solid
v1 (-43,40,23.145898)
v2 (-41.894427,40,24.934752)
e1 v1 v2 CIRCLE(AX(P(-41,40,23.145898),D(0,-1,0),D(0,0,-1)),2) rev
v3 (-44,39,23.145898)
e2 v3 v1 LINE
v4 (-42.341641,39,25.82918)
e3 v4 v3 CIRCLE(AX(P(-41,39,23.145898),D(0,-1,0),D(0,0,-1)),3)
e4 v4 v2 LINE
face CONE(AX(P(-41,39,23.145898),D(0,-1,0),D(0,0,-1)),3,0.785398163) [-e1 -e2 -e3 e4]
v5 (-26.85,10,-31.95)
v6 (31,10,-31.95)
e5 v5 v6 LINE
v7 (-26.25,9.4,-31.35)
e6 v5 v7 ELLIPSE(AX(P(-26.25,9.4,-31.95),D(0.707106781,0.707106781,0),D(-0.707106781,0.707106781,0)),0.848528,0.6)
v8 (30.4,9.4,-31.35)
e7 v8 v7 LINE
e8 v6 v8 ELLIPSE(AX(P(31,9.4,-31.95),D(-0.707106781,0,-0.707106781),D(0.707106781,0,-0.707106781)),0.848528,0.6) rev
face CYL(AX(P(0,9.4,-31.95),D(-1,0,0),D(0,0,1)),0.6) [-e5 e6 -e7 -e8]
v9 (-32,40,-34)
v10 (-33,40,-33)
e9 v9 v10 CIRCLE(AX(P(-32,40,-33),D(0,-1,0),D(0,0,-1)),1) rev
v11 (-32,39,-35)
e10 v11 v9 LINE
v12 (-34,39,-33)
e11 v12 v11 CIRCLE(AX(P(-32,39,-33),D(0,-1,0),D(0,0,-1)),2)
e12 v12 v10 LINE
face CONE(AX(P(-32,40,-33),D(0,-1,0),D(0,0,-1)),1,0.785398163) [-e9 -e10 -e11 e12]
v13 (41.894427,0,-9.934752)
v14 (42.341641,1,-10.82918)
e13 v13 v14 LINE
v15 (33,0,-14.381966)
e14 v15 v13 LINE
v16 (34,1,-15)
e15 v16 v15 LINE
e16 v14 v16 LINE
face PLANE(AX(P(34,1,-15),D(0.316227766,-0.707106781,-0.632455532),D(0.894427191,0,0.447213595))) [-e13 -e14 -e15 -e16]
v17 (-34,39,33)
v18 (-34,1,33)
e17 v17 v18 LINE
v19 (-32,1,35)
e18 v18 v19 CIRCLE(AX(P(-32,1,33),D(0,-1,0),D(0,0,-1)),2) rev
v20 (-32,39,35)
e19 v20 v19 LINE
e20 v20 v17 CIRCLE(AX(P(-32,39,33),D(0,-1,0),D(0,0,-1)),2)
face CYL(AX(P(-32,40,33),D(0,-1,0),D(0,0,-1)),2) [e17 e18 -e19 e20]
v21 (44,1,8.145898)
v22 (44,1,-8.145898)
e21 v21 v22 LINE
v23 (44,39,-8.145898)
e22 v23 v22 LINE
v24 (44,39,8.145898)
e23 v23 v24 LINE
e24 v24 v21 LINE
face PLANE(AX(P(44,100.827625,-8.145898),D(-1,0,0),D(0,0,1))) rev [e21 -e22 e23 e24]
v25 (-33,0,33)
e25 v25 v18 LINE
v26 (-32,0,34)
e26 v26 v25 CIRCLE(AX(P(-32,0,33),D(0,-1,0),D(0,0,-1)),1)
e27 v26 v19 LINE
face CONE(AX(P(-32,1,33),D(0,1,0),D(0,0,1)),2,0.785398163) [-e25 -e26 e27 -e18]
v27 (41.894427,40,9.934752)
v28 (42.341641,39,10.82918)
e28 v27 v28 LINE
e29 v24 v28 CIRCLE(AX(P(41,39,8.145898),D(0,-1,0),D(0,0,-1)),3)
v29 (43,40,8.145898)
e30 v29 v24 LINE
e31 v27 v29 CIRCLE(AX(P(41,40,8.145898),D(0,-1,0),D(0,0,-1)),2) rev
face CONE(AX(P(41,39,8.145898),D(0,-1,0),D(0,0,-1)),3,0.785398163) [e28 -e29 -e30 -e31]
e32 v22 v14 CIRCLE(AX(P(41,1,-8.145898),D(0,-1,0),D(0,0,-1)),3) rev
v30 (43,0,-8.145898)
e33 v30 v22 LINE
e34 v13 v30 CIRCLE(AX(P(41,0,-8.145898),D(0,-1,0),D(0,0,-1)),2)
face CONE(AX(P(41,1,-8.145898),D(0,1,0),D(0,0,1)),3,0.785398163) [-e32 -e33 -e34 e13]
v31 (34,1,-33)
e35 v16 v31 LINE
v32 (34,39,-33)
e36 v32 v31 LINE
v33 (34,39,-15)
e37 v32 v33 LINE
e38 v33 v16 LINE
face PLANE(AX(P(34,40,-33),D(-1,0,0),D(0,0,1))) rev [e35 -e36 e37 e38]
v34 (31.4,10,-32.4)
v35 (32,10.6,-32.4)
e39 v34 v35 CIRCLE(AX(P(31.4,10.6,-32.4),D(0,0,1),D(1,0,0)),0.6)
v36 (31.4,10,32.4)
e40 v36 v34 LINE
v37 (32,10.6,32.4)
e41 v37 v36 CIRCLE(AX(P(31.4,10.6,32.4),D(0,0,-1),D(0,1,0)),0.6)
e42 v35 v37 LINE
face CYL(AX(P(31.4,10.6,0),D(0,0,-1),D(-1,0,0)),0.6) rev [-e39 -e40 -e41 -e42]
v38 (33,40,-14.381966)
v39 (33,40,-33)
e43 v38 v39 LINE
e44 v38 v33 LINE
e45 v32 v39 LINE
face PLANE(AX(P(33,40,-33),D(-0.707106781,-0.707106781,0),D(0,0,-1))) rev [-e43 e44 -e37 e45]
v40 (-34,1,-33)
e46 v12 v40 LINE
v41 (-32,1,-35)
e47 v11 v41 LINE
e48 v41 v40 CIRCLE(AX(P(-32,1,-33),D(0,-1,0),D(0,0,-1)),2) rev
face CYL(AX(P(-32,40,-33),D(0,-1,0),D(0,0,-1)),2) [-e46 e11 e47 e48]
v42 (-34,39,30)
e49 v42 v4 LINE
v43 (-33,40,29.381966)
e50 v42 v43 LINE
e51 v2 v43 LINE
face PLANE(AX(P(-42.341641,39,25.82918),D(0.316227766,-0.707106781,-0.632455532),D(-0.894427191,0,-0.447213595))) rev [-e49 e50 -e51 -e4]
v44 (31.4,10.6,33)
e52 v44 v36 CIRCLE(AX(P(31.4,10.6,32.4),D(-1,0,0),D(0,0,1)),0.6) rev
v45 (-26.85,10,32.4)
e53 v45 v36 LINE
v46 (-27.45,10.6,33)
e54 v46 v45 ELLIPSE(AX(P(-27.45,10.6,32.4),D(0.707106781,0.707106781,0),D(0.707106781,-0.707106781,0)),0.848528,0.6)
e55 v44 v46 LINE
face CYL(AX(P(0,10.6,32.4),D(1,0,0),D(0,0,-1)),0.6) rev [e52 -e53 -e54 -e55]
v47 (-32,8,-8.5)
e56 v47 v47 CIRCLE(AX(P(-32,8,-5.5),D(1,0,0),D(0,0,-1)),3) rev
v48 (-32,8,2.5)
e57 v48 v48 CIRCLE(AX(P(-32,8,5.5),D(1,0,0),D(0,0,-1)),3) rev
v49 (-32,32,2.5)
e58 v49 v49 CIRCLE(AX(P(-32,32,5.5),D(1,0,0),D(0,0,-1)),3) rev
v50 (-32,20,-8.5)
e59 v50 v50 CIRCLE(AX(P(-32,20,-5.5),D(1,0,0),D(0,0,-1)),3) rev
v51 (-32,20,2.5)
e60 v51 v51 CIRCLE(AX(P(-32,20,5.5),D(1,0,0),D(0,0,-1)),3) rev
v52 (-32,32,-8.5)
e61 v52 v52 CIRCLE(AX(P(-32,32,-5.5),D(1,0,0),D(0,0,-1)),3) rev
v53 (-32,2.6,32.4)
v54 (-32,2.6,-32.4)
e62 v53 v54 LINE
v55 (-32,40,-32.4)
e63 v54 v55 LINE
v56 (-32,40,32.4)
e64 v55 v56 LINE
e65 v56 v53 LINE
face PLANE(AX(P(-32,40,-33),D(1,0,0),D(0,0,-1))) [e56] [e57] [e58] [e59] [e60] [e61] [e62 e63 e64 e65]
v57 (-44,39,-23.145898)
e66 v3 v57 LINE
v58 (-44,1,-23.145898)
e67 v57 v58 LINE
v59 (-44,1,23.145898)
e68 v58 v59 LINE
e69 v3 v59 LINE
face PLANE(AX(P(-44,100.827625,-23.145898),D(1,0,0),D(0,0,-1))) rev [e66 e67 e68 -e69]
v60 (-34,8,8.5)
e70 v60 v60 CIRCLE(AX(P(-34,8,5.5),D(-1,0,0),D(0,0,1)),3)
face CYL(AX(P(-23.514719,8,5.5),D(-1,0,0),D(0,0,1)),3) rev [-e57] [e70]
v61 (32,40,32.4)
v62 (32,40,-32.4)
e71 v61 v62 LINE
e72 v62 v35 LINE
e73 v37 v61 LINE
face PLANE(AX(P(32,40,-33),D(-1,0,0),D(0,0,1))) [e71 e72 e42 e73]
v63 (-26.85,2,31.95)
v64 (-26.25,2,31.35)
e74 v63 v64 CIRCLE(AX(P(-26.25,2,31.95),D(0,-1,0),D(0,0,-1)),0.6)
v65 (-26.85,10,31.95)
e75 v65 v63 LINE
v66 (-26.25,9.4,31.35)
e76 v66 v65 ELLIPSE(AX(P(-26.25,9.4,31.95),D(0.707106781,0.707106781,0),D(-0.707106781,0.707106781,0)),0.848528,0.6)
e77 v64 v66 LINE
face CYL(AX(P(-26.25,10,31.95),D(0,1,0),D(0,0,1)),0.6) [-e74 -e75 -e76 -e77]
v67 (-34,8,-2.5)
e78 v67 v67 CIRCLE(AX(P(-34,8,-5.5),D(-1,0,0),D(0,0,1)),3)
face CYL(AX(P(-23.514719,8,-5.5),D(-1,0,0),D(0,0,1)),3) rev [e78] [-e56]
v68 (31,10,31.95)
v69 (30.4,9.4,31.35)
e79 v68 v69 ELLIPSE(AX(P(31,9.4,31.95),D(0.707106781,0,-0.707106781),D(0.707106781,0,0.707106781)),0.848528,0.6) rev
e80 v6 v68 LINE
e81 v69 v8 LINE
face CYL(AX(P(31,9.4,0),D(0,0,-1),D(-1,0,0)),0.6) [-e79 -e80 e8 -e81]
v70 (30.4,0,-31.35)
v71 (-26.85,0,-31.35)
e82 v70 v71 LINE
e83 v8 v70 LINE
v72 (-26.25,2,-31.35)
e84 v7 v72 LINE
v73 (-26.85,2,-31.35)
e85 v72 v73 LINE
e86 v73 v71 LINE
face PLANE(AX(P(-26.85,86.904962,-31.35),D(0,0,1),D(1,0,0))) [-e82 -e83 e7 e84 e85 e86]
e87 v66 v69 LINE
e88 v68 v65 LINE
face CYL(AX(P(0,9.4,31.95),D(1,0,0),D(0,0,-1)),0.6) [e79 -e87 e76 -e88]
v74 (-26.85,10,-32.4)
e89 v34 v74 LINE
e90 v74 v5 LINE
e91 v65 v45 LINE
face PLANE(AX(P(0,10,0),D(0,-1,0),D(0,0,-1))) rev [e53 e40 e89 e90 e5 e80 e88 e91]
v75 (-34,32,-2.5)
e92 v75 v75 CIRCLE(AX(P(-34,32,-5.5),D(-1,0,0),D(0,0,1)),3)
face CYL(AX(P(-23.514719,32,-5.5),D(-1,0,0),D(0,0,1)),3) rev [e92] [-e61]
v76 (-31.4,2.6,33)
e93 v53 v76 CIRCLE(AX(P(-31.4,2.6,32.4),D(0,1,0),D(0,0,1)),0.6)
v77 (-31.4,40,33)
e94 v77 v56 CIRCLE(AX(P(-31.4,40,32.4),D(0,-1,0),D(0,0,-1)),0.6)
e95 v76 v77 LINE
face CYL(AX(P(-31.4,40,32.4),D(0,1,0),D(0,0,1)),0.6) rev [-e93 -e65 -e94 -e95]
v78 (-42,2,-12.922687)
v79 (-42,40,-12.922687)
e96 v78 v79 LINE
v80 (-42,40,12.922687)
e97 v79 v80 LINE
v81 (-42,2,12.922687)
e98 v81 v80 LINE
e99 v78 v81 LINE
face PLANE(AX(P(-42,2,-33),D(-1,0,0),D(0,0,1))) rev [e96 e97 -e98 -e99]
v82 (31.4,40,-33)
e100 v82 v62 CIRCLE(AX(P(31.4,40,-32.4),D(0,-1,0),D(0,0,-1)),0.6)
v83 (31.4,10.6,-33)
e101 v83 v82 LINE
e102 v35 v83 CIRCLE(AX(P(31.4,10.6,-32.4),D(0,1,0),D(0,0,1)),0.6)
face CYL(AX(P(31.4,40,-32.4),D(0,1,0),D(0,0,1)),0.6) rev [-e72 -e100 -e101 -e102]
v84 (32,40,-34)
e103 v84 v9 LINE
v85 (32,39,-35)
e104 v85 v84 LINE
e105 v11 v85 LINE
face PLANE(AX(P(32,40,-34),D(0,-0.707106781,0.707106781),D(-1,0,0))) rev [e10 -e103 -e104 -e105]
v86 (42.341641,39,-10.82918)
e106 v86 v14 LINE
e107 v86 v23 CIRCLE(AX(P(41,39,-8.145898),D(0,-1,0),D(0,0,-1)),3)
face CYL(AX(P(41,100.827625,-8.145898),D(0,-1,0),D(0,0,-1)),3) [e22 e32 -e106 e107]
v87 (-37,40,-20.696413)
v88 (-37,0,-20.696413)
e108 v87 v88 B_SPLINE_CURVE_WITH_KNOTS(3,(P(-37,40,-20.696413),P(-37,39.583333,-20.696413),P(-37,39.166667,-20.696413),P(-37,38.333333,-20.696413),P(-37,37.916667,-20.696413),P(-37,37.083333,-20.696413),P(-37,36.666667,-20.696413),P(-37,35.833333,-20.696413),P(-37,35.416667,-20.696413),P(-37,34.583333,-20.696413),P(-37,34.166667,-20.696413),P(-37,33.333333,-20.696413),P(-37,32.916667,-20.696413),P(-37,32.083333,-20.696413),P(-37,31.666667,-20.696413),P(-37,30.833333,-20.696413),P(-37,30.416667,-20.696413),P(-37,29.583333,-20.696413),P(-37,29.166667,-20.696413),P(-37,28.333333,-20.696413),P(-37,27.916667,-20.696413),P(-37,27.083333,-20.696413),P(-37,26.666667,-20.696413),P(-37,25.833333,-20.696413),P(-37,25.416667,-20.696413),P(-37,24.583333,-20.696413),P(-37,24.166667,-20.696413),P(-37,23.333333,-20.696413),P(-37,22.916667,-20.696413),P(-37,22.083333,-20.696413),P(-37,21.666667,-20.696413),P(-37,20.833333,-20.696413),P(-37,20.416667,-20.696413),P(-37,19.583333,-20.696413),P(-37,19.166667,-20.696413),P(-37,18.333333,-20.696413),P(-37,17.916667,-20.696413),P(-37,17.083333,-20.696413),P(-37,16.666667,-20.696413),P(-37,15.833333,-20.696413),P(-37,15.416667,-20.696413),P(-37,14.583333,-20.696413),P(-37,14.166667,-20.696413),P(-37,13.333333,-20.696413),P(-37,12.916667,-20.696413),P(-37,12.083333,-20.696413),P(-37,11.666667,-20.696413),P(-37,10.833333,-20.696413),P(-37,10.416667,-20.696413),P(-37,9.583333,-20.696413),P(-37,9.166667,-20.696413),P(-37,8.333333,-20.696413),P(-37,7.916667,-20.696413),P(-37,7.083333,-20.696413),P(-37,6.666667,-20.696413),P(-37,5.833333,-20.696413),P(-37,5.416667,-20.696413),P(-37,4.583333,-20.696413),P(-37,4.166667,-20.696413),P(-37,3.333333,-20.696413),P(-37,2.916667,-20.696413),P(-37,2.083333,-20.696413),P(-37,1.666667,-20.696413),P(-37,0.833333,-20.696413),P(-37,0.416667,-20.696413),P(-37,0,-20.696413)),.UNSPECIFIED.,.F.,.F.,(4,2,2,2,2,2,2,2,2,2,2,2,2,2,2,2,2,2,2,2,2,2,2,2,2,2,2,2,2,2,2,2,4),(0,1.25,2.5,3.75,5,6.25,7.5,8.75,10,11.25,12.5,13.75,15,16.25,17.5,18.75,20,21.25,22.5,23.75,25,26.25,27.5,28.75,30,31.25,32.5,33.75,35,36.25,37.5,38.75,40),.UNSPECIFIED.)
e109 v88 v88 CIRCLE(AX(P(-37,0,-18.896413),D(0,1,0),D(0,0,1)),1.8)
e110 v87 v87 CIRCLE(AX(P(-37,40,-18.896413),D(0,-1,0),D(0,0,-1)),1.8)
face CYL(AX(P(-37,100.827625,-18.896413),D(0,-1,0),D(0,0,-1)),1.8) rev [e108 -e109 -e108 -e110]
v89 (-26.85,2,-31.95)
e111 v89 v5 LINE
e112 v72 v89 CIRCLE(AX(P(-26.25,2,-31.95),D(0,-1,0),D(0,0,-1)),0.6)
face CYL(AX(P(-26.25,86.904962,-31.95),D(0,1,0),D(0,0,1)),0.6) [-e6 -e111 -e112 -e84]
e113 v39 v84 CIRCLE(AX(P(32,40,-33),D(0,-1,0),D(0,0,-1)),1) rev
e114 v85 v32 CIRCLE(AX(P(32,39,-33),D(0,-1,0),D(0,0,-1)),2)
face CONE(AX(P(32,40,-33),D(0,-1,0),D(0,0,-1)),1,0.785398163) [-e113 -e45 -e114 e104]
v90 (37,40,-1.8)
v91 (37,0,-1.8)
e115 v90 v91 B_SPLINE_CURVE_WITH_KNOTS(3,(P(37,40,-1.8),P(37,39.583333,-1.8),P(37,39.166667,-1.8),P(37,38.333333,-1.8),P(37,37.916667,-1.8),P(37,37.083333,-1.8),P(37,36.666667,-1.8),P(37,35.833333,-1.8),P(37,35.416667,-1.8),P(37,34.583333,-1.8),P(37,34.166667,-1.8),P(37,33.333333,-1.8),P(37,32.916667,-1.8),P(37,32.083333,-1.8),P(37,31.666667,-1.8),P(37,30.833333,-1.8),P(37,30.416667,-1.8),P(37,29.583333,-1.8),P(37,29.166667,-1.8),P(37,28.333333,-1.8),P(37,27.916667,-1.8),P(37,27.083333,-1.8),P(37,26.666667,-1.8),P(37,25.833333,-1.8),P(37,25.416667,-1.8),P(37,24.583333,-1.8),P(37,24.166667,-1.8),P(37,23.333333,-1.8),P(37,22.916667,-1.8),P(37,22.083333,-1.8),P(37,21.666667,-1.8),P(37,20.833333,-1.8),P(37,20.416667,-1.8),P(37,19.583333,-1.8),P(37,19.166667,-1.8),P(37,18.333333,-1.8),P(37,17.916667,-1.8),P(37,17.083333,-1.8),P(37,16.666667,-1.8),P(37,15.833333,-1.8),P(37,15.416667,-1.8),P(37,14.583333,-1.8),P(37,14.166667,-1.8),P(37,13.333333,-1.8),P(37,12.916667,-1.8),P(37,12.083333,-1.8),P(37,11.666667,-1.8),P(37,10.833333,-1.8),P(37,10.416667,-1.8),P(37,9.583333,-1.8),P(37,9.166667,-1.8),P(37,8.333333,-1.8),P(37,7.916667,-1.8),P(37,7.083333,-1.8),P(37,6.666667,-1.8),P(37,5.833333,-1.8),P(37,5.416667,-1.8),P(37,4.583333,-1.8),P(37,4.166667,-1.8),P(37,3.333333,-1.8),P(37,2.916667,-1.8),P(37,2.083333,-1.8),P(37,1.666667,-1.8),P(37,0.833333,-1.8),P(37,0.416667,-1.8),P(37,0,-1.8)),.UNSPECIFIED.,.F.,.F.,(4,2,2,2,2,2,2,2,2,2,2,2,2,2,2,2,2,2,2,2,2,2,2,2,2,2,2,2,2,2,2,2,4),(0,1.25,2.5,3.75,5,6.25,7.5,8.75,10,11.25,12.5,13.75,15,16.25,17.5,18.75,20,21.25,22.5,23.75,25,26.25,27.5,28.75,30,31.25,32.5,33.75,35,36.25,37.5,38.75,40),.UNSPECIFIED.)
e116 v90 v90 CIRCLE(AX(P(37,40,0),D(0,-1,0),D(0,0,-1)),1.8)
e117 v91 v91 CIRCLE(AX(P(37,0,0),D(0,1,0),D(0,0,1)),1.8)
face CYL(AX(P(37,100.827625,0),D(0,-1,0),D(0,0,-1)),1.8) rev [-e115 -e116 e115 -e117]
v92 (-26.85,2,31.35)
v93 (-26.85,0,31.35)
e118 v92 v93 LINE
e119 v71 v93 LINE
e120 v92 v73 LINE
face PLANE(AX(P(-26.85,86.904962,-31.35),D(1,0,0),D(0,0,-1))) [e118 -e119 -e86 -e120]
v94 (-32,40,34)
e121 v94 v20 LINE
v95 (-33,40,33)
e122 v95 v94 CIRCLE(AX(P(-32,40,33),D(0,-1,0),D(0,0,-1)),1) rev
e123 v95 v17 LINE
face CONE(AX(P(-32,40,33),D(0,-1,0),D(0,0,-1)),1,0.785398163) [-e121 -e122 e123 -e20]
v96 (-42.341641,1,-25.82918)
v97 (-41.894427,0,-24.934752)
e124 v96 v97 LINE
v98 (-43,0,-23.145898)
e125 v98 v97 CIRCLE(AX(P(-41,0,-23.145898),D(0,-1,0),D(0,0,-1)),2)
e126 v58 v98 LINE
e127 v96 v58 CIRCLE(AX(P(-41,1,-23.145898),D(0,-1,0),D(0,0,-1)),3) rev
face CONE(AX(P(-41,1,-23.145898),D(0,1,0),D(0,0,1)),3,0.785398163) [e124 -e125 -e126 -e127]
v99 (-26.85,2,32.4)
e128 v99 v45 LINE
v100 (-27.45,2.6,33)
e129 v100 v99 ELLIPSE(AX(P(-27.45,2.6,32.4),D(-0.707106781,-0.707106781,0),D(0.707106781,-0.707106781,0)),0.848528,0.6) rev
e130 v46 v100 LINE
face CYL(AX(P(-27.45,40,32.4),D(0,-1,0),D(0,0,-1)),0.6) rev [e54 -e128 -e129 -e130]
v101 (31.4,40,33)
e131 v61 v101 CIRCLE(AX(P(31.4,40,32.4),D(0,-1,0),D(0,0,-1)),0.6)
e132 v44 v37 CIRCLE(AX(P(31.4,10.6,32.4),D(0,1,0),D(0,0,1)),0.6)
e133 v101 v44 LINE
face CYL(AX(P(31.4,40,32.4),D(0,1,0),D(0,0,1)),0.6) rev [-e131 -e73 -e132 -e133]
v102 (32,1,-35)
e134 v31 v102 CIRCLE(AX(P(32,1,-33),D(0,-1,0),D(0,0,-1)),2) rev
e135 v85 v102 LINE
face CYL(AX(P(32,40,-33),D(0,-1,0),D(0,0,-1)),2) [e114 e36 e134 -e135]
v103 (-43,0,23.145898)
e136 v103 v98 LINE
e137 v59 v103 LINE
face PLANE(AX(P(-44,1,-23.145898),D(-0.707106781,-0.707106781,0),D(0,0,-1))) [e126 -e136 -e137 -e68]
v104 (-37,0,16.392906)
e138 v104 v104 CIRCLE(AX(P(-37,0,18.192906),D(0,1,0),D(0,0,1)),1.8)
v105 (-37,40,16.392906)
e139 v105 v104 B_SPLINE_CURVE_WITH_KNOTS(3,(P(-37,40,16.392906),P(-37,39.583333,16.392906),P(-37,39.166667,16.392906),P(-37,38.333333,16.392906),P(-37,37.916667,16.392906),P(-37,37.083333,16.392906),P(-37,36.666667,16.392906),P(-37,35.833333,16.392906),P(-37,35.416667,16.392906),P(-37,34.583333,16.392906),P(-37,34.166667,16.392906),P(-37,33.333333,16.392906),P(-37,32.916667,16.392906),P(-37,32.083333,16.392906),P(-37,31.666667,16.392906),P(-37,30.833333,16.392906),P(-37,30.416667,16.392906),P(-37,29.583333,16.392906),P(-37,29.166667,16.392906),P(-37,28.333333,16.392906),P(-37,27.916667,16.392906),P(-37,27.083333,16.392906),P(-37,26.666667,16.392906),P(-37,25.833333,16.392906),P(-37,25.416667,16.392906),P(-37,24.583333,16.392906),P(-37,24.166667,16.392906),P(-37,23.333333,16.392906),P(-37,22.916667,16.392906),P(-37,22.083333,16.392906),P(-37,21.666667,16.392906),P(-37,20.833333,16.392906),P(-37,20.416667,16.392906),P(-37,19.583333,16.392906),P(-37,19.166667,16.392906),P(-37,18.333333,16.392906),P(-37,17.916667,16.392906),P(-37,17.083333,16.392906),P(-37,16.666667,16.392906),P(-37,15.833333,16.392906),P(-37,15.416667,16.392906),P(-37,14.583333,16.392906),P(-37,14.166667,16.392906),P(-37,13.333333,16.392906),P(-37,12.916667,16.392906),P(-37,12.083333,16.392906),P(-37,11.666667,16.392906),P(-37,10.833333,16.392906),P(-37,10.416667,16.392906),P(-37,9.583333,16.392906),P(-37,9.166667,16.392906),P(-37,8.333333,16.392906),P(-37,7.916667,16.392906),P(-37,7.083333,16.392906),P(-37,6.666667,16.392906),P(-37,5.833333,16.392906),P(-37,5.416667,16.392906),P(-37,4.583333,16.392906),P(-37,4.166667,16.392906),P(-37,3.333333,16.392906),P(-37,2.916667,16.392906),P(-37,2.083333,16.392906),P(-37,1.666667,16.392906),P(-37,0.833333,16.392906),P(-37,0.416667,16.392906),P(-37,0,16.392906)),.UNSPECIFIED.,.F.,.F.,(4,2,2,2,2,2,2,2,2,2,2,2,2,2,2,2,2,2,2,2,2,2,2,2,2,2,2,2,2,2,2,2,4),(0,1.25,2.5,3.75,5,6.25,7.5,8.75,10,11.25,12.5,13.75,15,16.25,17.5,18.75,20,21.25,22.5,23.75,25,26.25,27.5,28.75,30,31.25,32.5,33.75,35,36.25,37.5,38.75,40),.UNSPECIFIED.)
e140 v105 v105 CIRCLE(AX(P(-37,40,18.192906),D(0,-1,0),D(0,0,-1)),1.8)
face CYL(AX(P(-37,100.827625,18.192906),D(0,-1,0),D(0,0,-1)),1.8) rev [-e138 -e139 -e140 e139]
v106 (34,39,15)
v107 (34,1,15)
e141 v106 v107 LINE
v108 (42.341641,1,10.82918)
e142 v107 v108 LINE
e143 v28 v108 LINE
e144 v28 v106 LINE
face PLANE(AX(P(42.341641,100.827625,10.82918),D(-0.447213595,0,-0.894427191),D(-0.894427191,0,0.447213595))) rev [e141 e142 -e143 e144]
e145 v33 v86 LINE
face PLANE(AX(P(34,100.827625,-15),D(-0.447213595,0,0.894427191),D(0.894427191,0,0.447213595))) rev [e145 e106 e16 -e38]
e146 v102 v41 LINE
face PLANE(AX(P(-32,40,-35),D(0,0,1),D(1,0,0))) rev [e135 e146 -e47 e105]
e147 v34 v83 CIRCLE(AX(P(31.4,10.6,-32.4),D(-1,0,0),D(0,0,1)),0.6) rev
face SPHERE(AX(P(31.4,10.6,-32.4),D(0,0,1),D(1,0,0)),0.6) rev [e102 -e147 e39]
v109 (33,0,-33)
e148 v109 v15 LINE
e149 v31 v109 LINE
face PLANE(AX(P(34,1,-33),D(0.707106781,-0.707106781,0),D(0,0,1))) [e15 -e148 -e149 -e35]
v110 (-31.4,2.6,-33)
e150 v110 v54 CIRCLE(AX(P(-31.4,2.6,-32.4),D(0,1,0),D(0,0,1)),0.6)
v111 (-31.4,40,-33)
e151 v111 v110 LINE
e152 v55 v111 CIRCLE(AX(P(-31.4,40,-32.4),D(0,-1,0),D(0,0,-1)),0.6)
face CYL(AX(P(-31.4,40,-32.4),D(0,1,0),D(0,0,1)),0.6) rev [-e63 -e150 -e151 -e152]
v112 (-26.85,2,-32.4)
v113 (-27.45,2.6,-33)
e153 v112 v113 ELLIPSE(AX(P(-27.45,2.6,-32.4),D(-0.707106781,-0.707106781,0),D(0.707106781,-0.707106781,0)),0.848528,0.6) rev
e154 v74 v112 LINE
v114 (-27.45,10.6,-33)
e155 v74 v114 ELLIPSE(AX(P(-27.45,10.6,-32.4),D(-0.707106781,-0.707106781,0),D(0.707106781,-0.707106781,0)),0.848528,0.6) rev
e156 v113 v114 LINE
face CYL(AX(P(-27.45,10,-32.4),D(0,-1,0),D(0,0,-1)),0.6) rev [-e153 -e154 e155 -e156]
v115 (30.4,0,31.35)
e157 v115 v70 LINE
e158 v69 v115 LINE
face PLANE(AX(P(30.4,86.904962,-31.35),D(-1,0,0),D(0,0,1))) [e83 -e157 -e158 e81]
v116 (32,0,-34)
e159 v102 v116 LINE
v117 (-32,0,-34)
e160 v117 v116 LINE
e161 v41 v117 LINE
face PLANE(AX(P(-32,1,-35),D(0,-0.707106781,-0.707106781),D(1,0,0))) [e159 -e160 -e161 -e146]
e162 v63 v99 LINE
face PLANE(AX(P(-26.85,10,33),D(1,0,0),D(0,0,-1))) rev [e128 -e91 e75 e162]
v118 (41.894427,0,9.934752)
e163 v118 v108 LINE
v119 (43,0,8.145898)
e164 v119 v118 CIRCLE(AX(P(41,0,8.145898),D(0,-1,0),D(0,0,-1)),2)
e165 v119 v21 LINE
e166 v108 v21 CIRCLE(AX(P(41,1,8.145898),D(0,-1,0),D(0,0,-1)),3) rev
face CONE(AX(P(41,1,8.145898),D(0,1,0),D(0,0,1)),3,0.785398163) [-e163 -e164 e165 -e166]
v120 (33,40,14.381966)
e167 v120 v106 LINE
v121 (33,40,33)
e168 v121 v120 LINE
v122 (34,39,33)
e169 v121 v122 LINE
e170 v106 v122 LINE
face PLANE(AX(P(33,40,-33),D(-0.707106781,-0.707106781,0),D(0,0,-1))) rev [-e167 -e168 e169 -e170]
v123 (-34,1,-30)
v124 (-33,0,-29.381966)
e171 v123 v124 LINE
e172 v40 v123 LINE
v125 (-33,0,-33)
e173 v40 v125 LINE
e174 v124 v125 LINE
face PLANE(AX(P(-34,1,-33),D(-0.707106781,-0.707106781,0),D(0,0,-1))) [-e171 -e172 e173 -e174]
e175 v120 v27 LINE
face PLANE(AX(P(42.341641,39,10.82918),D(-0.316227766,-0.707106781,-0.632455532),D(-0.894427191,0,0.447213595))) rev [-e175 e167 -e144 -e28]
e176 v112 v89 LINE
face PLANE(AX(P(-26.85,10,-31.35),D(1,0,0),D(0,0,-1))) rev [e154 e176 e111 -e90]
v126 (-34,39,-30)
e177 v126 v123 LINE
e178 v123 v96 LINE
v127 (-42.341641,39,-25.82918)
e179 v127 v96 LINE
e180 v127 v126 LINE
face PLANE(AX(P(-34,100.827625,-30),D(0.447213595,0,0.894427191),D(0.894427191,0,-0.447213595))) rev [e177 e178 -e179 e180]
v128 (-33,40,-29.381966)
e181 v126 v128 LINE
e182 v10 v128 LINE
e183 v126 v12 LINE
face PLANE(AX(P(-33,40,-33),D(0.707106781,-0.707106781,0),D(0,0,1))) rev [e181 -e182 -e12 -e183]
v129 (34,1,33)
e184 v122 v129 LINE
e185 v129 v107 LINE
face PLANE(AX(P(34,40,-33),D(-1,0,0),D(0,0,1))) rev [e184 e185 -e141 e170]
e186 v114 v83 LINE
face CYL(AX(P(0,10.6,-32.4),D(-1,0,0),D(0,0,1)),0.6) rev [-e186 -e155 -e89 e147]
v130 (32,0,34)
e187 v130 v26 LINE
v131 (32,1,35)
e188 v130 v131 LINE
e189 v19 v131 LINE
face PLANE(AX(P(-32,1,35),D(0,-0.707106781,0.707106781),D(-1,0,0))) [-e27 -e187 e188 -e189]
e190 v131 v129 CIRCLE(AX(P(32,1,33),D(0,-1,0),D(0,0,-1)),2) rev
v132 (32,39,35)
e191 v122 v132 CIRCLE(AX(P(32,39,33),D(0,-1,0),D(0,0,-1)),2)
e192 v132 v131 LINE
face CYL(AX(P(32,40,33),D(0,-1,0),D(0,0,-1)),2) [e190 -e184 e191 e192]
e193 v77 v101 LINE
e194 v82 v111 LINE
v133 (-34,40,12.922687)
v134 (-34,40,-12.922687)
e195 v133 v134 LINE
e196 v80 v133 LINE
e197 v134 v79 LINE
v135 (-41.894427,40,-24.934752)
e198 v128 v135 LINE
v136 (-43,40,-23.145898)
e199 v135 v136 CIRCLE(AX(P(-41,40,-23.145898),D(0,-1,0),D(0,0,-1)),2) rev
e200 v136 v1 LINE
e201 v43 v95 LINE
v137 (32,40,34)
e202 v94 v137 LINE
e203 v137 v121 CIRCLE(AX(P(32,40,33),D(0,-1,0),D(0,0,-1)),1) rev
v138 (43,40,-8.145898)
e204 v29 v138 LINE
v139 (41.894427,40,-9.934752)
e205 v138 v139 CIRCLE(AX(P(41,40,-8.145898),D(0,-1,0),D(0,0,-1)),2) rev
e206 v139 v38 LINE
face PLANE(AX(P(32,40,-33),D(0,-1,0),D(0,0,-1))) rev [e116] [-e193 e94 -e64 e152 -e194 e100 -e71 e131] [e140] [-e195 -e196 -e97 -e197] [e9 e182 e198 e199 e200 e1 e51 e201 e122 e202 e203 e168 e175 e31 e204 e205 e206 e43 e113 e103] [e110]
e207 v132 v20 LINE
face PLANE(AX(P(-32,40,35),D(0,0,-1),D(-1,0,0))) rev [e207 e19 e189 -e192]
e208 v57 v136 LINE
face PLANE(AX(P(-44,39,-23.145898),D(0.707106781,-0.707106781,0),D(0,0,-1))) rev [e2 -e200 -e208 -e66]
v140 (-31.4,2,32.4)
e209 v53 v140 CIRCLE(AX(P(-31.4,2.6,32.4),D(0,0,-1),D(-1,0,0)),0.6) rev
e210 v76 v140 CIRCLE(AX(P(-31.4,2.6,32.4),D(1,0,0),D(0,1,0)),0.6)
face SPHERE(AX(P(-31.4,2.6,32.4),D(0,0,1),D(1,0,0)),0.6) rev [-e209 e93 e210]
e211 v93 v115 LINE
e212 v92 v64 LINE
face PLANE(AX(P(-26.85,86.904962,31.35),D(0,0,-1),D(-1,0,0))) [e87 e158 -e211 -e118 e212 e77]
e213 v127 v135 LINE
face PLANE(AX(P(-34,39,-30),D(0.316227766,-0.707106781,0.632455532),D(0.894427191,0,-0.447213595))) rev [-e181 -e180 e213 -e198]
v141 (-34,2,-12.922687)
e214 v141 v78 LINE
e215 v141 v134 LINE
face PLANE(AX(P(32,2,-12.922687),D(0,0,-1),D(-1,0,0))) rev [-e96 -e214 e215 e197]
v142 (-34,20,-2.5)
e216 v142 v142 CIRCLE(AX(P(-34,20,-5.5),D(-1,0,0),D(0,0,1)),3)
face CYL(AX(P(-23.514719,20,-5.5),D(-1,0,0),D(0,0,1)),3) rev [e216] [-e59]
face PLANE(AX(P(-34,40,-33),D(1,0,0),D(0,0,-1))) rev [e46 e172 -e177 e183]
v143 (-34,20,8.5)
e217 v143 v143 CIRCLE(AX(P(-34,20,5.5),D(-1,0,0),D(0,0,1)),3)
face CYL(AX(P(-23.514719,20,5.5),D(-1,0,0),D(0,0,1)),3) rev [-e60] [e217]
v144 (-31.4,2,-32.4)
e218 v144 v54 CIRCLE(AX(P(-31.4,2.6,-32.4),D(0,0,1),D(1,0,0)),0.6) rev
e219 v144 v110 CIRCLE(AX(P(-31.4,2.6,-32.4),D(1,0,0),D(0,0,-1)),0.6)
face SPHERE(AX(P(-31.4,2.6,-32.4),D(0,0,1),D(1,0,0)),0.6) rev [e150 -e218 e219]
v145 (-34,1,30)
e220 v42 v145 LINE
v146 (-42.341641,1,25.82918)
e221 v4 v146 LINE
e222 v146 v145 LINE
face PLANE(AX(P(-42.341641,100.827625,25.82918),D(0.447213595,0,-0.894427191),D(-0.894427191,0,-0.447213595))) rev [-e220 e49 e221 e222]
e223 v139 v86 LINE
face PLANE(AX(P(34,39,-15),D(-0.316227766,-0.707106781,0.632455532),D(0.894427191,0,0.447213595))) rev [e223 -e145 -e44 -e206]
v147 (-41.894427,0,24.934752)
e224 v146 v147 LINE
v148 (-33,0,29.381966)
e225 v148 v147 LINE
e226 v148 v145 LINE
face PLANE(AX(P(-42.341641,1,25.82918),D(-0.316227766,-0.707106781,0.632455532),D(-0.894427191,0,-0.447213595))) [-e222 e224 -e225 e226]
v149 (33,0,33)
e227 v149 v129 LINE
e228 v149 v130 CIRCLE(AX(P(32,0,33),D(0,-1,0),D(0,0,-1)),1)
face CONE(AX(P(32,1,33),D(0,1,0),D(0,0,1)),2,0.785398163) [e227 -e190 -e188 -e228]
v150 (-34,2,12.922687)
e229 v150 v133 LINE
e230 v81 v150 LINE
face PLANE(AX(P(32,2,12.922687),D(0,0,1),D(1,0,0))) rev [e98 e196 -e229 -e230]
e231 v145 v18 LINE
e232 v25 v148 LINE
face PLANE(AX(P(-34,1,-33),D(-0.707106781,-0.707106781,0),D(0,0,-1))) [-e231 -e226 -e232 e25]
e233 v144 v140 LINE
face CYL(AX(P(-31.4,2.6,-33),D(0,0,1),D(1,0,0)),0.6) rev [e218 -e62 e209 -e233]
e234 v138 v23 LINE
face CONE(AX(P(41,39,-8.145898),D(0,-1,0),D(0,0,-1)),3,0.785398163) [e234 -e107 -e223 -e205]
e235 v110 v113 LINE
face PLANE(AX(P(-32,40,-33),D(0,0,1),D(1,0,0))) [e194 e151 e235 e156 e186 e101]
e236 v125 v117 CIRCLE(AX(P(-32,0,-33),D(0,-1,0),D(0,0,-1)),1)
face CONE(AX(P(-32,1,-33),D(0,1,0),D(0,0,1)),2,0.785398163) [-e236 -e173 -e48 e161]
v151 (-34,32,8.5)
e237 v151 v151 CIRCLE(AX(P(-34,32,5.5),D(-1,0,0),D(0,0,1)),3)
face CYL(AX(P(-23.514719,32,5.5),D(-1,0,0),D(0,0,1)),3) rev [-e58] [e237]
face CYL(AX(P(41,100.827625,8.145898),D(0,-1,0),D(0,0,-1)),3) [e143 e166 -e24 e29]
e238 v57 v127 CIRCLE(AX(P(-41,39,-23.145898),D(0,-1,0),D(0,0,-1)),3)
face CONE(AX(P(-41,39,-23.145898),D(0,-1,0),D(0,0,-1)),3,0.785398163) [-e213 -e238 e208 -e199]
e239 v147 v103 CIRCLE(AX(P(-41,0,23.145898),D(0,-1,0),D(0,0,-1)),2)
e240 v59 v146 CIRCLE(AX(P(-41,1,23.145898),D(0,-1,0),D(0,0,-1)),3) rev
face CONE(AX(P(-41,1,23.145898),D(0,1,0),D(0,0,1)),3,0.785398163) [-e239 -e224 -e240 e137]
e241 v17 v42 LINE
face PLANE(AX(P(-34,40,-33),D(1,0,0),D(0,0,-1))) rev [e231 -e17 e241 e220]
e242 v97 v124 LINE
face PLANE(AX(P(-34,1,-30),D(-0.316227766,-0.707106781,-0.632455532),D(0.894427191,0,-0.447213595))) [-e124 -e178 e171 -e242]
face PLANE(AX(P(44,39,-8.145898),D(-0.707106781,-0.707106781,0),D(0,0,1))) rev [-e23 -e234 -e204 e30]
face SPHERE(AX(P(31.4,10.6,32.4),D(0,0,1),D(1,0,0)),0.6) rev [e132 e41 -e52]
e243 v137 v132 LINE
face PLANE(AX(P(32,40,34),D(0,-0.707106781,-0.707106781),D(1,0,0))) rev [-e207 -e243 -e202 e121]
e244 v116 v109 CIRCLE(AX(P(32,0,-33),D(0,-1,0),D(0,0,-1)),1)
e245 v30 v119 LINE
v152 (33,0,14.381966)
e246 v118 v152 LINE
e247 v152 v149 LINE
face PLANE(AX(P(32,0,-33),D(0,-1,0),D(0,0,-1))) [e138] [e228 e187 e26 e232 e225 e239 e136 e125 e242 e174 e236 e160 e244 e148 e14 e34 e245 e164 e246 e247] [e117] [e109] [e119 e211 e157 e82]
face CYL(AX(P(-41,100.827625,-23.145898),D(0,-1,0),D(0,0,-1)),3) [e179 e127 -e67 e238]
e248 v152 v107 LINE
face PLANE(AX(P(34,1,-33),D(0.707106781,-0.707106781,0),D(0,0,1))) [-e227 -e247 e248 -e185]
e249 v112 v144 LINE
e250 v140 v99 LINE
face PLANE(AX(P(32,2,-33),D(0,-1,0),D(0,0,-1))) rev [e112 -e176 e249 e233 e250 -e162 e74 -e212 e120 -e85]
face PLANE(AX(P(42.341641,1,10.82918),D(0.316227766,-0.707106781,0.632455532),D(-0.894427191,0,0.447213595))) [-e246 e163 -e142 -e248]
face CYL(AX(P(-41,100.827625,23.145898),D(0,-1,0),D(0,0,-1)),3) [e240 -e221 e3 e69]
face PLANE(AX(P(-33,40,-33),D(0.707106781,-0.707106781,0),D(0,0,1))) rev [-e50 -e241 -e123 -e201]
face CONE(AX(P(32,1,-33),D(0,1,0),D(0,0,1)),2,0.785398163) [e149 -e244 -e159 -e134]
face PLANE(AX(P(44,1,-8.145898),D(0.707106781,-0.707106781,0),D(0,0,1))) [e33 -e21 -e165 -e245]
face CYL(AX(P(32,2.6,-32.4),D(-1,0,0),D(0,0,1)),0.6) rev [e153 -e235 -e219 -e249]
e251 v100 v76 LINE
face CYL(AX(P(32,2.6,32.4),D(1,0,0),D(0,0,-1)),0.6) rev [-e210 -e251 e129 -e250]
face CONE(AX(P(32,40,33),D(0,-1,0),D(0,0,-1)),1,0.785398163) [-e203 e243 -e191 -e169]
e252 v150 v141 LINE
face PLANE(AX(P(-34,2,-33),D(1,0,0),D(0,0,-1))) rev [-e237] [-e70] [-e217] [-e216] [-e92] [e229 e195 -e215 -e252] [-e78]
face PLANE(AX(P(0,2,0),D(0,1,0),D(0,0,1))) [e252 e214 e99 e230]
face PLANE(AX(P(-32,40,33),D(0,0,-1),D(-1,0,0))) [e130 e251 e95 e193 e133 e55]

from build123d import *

# Parameters (mm, degrees)
BOSS_EXTRUDE1_DEPTH = 40
SHELL1_START        = -33
SHELL1_OUTLINE_W    = 64
SHELL1_OUTLINE_H    = 38
SHELL1_DEPTH        = 66
SKETCH2_R           = 1.8
BOSS_EXTRUDE2_DEPTH = 40
CUT_EXTRUDE1_START  = 40
SKETCH3_W           = 8
SKETCH3_H           = 25.845374508
CUT_EXTRUDE1_DEPTH  = 38
SKETCH4_R           = 3
CUT_EXTRUDE2_DEPTH  = 2
SKETCH5_W           = 57.25
SKETCH5_H           = 62.7
CUT_EXTRUDE3_DEPTH  = 2
BOSS_EXTRUDE3_DEPTH = 8
CHAMFER1_SIZE       = 1
FILLET1_R           = 0.6


# Read off the part's stored shape, not the designer's step: Shell1
with BuildPart() as part:
    # Sketch1 → Boss-Extrude1 (new body)
    with BuildSketch(Plane(origin=(0, 0, 0), x_dir=(1, 0, 0), z_dir=(0, 1, 0))):
        with BuildLine():
            Line((-32, 35), (32, 35))
            ThreePointArc((32, 35), (33.414213562, 34.414213562), (34, 33))
            Line((34, 33), (34, -33))
            ThreePointArc((34, -33), (33.414213562, -34.414213562), (32, -35))
            Line((32, -35), (-32, -35))
            ThreePointArc((-32, -35), (-33.414213562, -34.414213562), (-34, -33))
            Line((-34, -33), (-34, 33))
            ThreePointArc((-34, 33), (-33.414213562, 34.414213562), (-32, 35))
        make_face()
    extrude(amount=BOSS_EXTRUDE1_DEPTH)

    # Shell1 outline → Shell1 (cut)
    with BuildSketch(Plane.XY.offset(SHELL1_START)):
        with Locations((0, 21)):
            Rectangle(SHELL1_OUTLINE_W, SHELL1_OUTLINE_H)
    extrude(amount=SHELL1_DEPTH, mode=Mode.SUBTRACT)

    # Sketch2 → Boss-Extrude2 (add)
    # profile 1 of 2: a face of its own
    with BuildSketch(Plane(origin=(0, 0, 0), x_dir=(1, 0, 0), z_dir=(0, 1, 0))):
        with BuildLine():
            Line((-34, 30), (-42.341640786, 25.829179607))
            ThreePointArc((-42.341640786, 25.829179607), (-43.551952425, 24.72309137), (-44, 23.145898034))
            Line((-44, 23.145898034), (-44, -23.145898034))
            ThreePointArc((-44, -23.145898034), (-43.551952425, -24.72309137), (-42.341640786, -25.829179607))
            Line((-42.341640786, -25.829179607), (-34, -30))
            Line((-34, -30), (-34, 30))
        make_face()
        with Locations(Location((-37, 18.896413475, 0), (0, 0, 90))):
            Circle(SKETCH2_R, mode=Mode.SUBTRACT)
        with Locations(Location((-37, -18.192906379, 0), (0, 0, 90))):
            Circle(SKETCH2_R, mode=Mode.SUBTRACT)
    # profile 2 of 2: a face of its own
    with BuildSketch(Plane(origin=(0, 0, 0), x_dir=(1, 0, 0), z_dir=(0, 1, 0))):
        with BuildLine():
            Line((34, 15), (42.341640786, 10.829179607))
            ThreePointArc((42.341640786, 10.829179607), (43.551952425, 9.72309137), (44, 8.145898034))
            Line((44, 8.145898034), (44, -8.145898034))
            ThreePointArc((44, -8.145898034), (43.551952425, -9.72309137), (42.341640786, -10.829179607))
            Line((42.341640786, -10.829179607), (34, -15))
            Line((34, -15), (34, 15))
        make_face()
        with Locations(Location((37, 0, 0), (0, 0, 90))):
            Circle(SKETCH2_R, mode=Mode.SUBTRACT)
    extrude(amount=BOSS_EXTRUDE2_DEPTH)

    # Sketch3 → Cut-Extrude1 (cut)
    with BuildSketch(Plane(origin=(0, 0, 0), x_dir=(1, 0, 0), z_dir=(0, 1, 0)).offset(CUT_EXTRUDE1_START)):
        with Locations((-38, 0)):
            Rectangle(SKETCH3_W, SKETCH3_H)
    extrude(amount=-CUT_EXTRUDE1_DEPTH, mode=Mode.SUBTRACT)

    # Sketch4 → Cut-Extrude2 (cut)
    with BuildSketch(Plane.ZY.offset(34)):
        with Locations((-5.5, 32)):
            Circle(SKETCH4_R)
        with Locations((5.5, 32)):
            Circle(SKETCH4_R)
        with Locations((-5.5, 20)):
            Circle(SKETCH4_R)
        with Locations((5.5, 20)):
            Circle(SKETCH4_R)
        with Locations((-5.5, 8)):
            Circle(SKETCH4_R)
        with Locations((5.5, 8)):
            Circle(SKETCH4_R)
    extrude(amount=-CUT_EXTRUDE2_DEPTH, mode=Mode.SUBTRACT)

    # Sketch5 → Cut-Extrude3 (cut)
    with BuildSketch(Plane(origin=(0, 0, 0), x_dir=(1, 0, 0), z_dir=(0, 1, 0))):
        with Locations((1.775, 0)):
            Rectangle(SKETCH5_W, SKETCH5_H)
    extrude(amount=CUT_EXTRUDE3_DEPTH, mode=Mode.SUBTRACT)

    # Sketch6 → Boss-Extrude3 (add)
    with BuildSketch(Plane(origin=(0, 2, 0), x_dir=(1, 0, 0), z_dir=(0, 1, 0))):
        Polygon((-26.85, 31.35), (-26.85, 33), (32, 33), (32, -33), (-26.85, -33), (-26.85, -31.35), (30.4, -31.35), (30.4, 31.35), align=None)
    extrude(amount=BOSS_EXTRUDE3_DEPTH)

    # Chamfer1
    chamfer1_edges = [part.edges().sort_by_distance(p)[0] for p in [
        (-34, 0, -31.5),
        (-33.414213562, 0, -34.414213562),
        (0, 0, -35),
        (33.414213562, 0, -34.414213562),
        (-33.414213562, 40, -34.414213562),
        (-34, 40, -31.5),
        (-33.414213562, 40, 34.414213562),
        (0, 40, 35),
        (33.414213562, 40, 34.414213562),
        (34, 40, 24),
        (-34, 0, 31.5),
        (-34, 40, 31.5),
        (-38.170820393, 40, -27.914589803),
        (-38.170820393, 0, -27.914589803),
        (-43.551952425, 40, -24.72309137),
        (-43.551952425, 0, -24.72309137),
        (-44, 40, 0),
        (-44, 0, 0),
        (-43.551952425, 40, 24.72309137),
        (-43.551952425, 0, 24.72309137),
        (-38.170820393, 40, 27.914589803),
        (-38.170820393, 0, 27.914589803),
        (33.414213562, 40, -34.414213562),
        (34, 0, -24),
        (34, 40, -24),
        (38.170820393, 40, 12.914589803),
        (38.170820393, 0, 12.914589803),
        (43.551952425, 40, 9.72309137),
        (43.551952425, 0, 9.72309137),
        (44, 40, 0),
        (44, 0, 0),
        (43.551952425, 40, -9.72309137),
        (43.551952425, 0, -9.72309137),
        (38.170820393, 40, -12.914589803),
        (38.170820393, 0, -12.914589803),
        (34, 0, 24),
        (0, 40, -35),
        (33.414213562, 0, 34.414213562),
        (0, 0, 35),
        (-33.414213562, 0, 34.414213562),
    ]]
    chamfer(chamfer1_edges, length=CHAMFER1_SIZE)

    # Fillet1
    fillet1_edges = [part.edges().sort_by_distance(p)[0] for p in [
        (-29.425, 2, -33),
        (-26.85, 6, -31.35),
        (-26.85, 6, 31.35),
        (-26.85, 6, 33),
        (-26.85, 6, -33),
        (1.775, 10, -31.35),
        (30.4, 10, 0),
        (1.775, 10, 31.35),
        (2.575, 10, 33),
        (32, 10, 0),
        (2.575, 10, -33),
        (32, 25, -33),
        (-32, 2, 0),
        (-32, 21, -33),
        (-29.425, 2, 33),
        (-32, 21, 33),
        (32, 25, 33),
    ]]
    fillet(fillet1_edges, radius=FILLET1_R)


solid = part.part
